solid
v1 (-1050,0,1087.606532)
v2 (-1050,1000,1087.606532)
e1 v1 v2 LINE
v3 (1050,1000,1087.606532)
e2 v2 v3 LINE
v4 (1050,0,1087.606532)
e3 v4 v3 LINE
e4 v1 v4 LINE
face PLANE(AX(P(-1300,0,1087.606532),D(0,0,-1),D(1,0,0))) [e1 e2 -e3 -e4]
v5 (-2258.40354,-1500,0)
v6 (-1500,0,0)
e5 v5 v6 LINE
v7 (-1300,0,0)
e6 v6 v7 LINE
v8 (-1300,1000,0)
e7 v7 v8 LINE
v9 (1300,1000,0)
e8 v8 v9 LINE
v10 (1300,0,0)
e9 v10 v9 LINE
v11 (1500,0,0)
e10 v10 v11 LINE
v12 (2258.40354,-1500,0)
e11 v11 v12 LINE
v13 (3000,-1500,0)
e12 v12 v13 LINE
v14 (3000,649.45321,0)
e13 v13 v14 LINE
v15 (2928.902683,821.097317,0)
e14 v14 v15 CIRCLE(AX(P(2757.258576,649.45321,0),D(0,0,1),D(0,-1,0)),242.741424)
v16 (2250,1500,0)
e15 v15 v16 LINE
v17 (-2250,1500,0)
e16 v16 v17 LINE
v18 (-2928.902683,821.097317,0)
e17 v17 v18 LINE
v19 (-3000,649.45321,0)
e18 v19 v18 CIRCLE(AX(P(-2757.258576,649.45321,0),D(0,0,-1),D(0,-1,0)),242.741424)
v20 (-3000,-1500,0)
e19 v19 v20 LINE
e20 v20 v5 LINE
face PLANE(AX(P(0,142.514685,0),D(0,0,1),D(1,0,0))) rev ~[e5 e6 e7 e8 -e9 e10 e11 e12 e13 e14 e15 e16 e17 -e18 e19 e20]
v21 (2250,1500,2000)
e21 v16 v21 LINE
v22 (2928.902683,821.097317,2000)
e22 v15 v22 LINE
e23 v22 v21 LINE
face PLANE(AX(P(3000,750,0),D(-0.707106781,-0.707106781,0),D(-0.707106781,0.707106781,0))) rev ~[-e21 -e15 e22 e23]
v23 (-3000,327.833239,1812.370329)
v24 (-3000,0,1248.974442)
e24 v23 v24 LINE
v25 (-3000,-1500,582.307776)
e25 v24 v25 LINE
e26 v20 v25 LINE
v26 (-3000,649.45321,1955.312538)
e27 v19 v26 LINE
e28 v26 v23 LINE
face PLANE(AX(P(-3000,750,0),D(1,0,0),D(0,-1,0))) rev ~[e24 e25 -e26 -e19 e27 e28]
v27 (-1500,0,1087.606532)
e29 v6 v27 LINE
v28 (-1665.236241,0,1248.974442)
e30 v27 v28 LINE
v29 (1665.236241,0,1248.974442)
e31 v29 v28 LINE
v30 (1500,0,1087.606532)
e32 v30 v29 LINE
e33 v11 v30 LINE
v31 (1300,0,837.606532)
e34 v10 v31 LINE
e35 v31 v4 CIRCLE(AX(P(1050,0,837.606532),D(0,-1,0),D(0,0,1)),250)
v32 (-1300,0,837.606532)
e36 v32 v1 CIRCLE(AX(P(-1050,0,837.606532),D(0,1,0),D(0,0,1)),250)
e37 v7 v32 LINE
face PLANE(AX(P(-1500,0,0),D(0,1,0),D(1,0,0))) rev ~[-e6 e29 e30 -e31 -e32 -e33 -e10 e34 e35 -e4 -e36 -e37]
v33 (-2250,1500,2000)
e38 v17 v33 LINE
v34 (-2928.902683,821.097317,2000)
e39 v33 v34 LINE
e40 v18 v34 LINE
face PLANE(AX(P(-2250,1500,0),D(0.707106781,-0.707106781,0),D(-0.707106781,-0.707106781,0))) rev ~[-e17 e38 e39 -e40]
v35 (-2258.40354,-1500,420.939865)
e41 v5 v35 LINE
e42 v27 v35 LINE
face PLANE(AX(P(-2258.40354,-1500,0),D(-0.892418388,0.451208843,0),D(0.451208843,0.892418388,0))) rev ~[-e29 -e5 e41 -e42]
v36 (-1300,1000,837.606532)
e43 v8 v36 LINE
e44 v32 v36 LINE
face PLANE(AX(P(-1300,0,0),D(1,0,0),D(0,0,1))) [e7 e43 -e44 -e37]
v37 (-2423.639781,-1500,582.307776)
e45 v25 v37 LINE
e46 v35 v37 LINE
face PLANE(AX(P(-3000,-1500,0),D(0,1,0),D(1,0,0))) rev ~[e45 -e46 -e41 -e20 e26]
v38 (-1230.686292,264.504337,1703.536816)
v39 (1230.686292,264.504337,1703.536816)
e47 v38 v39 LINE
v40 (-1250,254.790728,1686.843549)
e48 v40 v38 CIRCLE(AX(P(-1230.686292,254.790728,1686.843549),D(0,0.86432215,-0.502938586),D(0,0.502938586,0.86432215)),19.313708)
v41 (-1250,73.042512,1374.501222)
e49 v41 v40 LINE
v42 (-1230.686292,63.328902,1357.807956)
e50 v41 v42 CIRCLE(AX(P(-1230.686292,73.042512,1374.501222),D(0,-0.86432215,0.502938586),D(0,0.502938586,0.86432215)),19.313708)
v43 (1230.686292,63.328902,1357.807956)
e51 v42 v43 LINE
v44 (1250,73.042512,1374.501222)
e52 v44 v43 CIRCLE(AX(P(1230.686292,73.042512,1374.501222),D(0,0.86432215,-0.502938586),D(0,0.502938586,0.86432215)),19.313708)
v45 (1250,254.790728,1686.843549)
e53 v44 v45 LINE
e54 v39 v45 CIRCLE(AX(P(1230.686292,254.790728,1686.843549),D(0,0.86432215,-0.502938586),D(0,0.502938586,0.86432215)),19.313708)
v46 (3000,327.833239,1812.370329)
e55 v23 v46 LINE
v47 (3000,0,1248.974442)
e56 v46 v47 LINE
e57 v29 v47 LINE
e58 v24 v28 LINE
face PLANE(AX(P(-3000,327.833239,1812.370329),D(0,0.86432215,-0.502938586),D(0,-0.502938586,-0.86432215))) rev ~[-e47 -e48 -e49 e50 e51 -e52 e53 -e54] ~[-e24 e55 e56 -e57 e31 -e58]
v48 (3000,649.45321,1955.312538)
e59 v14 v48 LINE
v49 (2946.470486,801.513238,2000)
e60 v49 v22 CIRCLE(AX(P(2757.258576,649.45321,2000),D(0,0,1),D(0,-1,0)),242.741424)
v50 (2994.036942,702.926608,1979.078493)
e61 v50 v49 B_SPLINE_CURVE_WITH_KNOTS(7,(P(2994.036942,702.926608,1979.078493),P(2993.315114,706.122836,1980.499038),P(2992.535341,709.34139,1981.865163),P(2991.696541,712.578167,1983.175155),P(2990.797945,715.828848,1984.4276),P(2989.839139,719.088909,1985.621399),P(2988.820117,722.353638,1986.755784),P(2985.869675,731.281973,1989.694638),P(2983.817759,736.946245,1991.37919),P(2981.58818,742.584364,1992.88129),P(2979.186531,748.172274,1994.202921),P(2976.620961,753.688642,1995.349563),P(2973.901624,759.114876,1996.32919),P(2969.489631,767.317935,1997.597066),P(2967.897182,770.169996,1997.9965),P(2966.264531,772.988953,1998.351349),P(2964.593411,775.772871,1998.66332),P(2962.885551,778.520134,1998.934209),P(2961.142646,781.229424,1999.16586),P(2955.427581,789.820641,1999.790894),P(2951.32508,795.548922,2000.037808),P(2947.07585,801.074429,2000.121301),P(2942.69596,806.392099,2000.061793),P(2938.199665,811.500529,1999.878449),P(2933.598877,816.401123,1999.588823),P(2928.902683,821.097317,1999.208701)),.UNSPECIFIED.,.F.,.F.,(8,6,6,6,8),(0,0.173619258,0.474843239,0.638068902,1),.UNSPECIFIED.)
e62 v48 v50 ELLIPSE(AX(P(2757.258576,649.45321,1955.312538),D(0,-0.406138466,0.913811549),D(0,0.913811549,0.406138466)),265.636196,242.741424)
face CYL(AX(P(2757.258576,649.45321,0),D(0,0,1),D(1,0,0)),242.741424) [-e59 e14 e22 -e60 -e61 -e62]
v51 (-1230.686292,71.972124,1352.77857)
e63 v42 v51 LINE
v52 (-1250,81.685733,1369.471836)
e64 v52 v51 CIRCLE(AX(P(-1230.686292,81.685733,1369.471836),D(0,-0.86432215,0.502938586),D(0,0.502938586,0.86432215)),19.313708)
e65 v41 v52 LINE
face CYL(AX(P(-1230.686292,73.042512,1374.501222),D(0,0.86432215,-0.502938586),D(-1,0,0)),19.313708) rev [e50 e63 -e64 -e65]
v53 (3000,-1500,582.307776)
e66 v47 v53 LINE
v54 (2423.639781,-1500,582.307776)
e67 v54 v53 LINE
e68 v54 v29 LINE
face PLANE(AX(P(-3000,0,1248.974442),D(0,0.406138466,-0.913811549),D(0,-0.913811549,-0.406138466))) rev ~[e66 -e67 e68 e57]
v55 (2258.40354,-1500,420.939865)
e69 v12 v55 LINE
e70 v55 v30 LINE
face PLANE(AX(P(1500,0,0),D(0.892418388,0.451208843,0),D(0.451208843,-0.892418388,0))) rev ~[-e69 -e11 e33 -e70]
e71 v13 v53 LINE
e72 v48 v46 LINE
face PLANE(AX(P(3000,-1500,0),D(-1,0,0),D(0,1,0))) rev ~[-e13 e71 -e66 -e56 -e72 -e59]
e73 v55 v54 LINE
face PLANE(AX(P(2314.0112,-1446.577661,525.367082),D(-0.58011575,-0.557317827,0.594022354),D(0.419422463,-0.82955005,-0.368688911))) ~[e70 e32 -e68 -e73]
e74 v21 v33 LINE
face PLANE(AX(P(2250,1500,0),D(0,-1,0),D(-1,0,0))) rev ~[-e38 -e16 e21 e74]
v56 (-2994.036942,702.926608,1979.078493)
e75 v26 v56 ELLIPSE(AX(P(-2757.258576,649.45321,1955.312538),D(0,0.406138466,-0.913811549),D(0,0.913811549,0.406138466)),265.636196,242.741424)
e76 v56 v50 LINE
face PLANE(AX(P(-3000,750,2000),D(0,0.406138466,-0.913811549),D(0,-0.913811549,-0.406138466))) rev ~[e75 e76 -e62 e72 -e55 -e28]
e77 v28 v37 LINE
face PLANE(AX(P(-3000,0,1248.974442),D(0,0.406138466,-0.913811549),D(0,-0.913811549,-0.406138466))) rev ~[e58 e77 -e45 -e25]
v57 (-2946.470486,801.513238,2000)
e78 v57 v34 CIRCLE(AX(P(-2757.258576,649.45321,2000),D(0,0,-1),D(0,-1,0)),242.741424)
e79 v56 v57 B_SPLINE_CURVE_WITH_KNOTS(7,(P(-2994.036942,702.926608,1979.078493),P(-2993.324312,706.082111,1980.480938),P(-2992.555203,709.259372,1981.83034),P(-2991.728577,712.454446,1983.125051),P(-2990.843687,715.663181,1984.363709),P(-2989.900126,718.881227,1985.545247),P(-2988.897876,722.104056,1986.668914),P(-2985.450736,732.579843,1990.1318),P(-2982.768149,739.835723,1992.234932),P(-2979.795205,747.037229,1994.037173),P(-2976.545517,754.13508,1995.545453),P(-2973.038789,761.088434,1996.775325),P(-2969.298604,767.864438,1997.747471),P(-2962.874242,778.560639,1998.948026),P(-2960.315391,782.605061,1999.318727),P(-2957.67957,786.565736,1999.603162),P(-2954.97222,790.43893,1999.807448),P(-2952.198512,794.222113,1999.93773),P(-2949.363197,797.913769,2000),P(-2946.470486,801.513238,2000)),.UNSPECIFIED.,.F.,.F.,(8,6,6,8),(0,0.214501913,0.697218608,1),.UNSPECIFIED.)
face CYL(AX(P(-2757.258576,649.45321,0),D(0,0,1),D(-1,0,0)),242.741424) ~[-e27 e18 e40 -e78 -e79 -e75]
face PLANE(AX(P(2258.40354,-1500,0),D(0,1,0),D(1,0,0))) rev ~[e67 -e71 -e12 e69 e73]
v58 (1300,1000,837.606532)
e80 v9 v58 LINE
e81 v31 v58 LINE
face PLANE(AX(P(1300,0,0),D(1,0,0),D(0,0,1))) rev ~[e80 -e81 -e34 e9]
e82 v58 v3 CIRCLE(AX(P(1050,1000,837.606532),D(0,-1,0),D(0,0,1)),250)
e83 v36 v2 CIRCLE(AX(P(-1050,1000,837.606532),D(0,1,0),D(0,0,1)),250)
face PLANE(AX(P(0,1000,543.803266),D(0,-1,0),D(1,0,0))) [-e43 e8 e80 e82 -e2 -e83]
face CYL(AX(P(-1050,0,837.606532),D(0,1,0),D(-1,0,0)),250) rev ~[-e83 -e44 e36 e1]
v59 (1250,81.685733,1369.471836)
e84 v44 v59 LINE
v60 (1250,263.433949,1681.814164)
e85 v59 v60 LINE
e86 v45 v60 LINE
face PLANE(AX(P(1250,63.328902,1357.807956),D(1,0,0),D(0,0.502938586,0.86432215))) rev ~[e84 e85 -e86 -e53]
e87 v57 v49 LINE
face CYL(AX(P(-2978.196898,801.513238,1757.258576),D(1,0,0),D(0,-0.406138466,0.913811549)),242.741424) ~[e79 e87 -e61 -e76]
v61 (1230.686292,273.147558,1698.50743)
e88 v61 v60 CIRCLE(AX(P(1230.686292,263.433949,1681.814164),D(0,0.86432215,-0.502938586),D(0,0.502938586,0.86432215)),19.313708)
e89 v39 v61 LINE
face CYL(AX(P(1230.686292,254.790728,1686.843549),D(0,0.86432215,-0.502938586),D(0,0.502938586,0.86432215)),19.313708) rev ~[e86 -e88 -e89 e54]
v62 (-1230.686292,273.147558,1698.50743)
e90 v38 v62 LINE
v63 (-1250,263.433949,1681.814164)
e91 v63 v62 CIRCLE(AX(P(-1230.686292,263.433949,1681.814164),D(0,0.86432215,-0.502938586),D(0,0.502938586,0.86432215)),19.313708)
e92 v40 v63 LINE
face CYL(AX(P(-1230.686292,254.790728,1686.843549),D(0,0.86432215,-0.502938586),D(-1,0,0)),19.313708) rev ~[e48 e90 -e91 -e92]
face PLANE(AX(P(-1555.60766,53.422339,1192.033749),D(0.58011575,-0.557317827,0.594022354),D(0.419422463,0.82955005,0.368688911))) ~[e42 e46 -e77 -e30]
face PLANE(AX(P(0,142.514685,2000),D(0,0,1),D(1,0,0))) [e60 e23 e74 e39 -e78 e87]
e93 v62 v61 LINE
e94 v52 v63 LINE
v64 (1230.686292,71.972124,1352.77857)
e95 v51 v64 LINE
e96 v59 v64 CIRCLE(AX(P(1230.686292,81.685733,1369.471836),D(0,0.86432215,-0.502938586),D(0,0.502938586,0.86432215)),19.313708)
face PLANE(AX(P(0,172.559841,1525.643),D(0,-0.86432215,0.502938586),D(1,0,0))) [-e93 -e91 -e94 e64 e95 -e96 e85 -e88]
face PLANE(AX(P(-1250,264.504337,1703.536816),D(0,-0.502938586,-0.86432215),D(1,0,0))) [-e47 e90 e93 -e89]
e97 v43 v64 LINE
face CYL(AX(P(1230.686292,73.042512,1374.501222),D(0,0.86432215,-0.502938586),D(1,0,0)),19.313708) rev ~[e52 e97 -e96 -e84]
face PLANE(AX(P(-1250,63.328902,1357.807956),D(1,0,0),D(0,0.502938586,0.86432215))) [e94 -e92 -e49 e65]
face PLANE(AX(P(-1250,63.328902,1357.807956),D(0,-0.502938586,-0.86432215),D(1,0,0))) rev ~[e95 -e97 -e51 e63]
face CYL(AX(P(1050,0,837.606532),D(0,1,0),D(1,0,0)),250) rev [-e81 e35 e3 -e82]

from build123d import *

# Parameters (mm, degrees)
F1_DEPTH = 2000
F3_DEPTH = 6000.001
F4_SIZE  = 150
F5_W     = 2600
F5_H     = 1087.6065318632
F6_DEPTH = 1000
F7_W     = 2500
F7_H     = 400
F8_DEPTH = 10
F9_R     = 19.313708499
F10_F1_R = 242.7414236909
F10_F2_R = 242.7414236909
F10_F3_R = 242.7414236909
F11_R    = 250


with BuildPart() as f1:
    # F0 (on Top) → F1 (new body)
    with BuildSketch(Plane.XY):
        Polygon((-3000, -1500), (-2258.4035396576, -1500), (-1500, 0), (1500, 0), (2258.4035396576, -1500), (3000, -1500), (3000, 750), (2250, 1500), (-2250, 1500), (-3000, 750), align=None)
    extrude(amount=F1_DEPTH)

    # F2 (on face) → F3 (cut, through all)
    with BuildSketch(Plane(origin=(-3000, 0, 0), x_dir=(0, -1, 0), z_dir=(-1, 0, 0))):
        Polygon((1500, 2000), (-750, 2000), (-327.833239258, 1812.3703285591), (1500, 1000), align=None)
        Polygon((1500, 1000), (-327.833239258, 1812.3703285591), (0, 1248.974442482), (1500, 582.3077758153), align=None)
    extrude(amount=-F3_DEPTH, mode=Mode.SUBTRACT)

    # F4
    f4_edges = [f1.edges().sort_by_distance(p)[0] for p in [
        (-1879.20177, -750, 915.641109),
        (1879.20177, -750, 915.641109),
    ]]
    chamfer(f4_edges, length=F4_SIZE)

    # F5 (on face) → F6 (cut)
    with BuildSketch(Plane.XZ):
        with Locations((0, 543.8032659316)):
            Rectangle(F5_W, F5_H)
    extrude(amount=-F6_DEPTH, mode=Mode.SUBTRACT)

    # F7 (on face) → F8 (cut)
    with BuildSketch(Plane(origin=(0, -542.9303888793, 315.9246144256), x_dir=(1, 0, 0), z_dir=(0, -0.86432215, 0.5029385858))):
        with Locations((0, 1405.4340400094)):
            Rectangle(F7_W, F7_H)
    extrude(amount=-F8_DEPTH, mode=Mode.SUBTRACT)

    # F9
    f9_edges = [f1.edges().sort_by_distance(p)[0] for p in [
        (-1250, 67.650513, 1355.293263),
        (-1250, 268.825948, 1701.022123),
        (1250, 268.825948, 1701.022123),
        (1250, 67.650513, 1355.293263),
    ]]
    fillet(f9_edges, radius=F9_R)

    # F10: fillet of radius 242.7414236909 on 3 edges, made by hand

    # F10_f1
    f10_f1_edges = [f1.edges().sort_by_distance(p)[0] for p in [
        (-3000, 750, 1000),
    ]]
    fillet(f10_f1_edges, radius=F10_F1_R)

    # F10_f2
    f10_f2_edges = [f1.edges().sort_by_distance(p)[0] for p in [
        (10.9015511853, 750, 2000),
    ]]
    fillet(f10_f2_edges, radius=F10_F2_R)

    # F10_f3
    f10_f3_edges = [f1.edges().sort_by_distance(p)[0] for p in [
        (3000, 750, 997.2355539079),
    ]]
    fillet(f10_f3_edges, radius=F10_F3_R)

    # F11
    f11_edges = [f1.edges().sort_by_distance(p)[0] for p in [
        (-1300, 500, 1087.606532),
        (1300, 500, 1087.606532),
    ]]
    fillet(f11_edges, radius=F11_R)


solid = f1.part
